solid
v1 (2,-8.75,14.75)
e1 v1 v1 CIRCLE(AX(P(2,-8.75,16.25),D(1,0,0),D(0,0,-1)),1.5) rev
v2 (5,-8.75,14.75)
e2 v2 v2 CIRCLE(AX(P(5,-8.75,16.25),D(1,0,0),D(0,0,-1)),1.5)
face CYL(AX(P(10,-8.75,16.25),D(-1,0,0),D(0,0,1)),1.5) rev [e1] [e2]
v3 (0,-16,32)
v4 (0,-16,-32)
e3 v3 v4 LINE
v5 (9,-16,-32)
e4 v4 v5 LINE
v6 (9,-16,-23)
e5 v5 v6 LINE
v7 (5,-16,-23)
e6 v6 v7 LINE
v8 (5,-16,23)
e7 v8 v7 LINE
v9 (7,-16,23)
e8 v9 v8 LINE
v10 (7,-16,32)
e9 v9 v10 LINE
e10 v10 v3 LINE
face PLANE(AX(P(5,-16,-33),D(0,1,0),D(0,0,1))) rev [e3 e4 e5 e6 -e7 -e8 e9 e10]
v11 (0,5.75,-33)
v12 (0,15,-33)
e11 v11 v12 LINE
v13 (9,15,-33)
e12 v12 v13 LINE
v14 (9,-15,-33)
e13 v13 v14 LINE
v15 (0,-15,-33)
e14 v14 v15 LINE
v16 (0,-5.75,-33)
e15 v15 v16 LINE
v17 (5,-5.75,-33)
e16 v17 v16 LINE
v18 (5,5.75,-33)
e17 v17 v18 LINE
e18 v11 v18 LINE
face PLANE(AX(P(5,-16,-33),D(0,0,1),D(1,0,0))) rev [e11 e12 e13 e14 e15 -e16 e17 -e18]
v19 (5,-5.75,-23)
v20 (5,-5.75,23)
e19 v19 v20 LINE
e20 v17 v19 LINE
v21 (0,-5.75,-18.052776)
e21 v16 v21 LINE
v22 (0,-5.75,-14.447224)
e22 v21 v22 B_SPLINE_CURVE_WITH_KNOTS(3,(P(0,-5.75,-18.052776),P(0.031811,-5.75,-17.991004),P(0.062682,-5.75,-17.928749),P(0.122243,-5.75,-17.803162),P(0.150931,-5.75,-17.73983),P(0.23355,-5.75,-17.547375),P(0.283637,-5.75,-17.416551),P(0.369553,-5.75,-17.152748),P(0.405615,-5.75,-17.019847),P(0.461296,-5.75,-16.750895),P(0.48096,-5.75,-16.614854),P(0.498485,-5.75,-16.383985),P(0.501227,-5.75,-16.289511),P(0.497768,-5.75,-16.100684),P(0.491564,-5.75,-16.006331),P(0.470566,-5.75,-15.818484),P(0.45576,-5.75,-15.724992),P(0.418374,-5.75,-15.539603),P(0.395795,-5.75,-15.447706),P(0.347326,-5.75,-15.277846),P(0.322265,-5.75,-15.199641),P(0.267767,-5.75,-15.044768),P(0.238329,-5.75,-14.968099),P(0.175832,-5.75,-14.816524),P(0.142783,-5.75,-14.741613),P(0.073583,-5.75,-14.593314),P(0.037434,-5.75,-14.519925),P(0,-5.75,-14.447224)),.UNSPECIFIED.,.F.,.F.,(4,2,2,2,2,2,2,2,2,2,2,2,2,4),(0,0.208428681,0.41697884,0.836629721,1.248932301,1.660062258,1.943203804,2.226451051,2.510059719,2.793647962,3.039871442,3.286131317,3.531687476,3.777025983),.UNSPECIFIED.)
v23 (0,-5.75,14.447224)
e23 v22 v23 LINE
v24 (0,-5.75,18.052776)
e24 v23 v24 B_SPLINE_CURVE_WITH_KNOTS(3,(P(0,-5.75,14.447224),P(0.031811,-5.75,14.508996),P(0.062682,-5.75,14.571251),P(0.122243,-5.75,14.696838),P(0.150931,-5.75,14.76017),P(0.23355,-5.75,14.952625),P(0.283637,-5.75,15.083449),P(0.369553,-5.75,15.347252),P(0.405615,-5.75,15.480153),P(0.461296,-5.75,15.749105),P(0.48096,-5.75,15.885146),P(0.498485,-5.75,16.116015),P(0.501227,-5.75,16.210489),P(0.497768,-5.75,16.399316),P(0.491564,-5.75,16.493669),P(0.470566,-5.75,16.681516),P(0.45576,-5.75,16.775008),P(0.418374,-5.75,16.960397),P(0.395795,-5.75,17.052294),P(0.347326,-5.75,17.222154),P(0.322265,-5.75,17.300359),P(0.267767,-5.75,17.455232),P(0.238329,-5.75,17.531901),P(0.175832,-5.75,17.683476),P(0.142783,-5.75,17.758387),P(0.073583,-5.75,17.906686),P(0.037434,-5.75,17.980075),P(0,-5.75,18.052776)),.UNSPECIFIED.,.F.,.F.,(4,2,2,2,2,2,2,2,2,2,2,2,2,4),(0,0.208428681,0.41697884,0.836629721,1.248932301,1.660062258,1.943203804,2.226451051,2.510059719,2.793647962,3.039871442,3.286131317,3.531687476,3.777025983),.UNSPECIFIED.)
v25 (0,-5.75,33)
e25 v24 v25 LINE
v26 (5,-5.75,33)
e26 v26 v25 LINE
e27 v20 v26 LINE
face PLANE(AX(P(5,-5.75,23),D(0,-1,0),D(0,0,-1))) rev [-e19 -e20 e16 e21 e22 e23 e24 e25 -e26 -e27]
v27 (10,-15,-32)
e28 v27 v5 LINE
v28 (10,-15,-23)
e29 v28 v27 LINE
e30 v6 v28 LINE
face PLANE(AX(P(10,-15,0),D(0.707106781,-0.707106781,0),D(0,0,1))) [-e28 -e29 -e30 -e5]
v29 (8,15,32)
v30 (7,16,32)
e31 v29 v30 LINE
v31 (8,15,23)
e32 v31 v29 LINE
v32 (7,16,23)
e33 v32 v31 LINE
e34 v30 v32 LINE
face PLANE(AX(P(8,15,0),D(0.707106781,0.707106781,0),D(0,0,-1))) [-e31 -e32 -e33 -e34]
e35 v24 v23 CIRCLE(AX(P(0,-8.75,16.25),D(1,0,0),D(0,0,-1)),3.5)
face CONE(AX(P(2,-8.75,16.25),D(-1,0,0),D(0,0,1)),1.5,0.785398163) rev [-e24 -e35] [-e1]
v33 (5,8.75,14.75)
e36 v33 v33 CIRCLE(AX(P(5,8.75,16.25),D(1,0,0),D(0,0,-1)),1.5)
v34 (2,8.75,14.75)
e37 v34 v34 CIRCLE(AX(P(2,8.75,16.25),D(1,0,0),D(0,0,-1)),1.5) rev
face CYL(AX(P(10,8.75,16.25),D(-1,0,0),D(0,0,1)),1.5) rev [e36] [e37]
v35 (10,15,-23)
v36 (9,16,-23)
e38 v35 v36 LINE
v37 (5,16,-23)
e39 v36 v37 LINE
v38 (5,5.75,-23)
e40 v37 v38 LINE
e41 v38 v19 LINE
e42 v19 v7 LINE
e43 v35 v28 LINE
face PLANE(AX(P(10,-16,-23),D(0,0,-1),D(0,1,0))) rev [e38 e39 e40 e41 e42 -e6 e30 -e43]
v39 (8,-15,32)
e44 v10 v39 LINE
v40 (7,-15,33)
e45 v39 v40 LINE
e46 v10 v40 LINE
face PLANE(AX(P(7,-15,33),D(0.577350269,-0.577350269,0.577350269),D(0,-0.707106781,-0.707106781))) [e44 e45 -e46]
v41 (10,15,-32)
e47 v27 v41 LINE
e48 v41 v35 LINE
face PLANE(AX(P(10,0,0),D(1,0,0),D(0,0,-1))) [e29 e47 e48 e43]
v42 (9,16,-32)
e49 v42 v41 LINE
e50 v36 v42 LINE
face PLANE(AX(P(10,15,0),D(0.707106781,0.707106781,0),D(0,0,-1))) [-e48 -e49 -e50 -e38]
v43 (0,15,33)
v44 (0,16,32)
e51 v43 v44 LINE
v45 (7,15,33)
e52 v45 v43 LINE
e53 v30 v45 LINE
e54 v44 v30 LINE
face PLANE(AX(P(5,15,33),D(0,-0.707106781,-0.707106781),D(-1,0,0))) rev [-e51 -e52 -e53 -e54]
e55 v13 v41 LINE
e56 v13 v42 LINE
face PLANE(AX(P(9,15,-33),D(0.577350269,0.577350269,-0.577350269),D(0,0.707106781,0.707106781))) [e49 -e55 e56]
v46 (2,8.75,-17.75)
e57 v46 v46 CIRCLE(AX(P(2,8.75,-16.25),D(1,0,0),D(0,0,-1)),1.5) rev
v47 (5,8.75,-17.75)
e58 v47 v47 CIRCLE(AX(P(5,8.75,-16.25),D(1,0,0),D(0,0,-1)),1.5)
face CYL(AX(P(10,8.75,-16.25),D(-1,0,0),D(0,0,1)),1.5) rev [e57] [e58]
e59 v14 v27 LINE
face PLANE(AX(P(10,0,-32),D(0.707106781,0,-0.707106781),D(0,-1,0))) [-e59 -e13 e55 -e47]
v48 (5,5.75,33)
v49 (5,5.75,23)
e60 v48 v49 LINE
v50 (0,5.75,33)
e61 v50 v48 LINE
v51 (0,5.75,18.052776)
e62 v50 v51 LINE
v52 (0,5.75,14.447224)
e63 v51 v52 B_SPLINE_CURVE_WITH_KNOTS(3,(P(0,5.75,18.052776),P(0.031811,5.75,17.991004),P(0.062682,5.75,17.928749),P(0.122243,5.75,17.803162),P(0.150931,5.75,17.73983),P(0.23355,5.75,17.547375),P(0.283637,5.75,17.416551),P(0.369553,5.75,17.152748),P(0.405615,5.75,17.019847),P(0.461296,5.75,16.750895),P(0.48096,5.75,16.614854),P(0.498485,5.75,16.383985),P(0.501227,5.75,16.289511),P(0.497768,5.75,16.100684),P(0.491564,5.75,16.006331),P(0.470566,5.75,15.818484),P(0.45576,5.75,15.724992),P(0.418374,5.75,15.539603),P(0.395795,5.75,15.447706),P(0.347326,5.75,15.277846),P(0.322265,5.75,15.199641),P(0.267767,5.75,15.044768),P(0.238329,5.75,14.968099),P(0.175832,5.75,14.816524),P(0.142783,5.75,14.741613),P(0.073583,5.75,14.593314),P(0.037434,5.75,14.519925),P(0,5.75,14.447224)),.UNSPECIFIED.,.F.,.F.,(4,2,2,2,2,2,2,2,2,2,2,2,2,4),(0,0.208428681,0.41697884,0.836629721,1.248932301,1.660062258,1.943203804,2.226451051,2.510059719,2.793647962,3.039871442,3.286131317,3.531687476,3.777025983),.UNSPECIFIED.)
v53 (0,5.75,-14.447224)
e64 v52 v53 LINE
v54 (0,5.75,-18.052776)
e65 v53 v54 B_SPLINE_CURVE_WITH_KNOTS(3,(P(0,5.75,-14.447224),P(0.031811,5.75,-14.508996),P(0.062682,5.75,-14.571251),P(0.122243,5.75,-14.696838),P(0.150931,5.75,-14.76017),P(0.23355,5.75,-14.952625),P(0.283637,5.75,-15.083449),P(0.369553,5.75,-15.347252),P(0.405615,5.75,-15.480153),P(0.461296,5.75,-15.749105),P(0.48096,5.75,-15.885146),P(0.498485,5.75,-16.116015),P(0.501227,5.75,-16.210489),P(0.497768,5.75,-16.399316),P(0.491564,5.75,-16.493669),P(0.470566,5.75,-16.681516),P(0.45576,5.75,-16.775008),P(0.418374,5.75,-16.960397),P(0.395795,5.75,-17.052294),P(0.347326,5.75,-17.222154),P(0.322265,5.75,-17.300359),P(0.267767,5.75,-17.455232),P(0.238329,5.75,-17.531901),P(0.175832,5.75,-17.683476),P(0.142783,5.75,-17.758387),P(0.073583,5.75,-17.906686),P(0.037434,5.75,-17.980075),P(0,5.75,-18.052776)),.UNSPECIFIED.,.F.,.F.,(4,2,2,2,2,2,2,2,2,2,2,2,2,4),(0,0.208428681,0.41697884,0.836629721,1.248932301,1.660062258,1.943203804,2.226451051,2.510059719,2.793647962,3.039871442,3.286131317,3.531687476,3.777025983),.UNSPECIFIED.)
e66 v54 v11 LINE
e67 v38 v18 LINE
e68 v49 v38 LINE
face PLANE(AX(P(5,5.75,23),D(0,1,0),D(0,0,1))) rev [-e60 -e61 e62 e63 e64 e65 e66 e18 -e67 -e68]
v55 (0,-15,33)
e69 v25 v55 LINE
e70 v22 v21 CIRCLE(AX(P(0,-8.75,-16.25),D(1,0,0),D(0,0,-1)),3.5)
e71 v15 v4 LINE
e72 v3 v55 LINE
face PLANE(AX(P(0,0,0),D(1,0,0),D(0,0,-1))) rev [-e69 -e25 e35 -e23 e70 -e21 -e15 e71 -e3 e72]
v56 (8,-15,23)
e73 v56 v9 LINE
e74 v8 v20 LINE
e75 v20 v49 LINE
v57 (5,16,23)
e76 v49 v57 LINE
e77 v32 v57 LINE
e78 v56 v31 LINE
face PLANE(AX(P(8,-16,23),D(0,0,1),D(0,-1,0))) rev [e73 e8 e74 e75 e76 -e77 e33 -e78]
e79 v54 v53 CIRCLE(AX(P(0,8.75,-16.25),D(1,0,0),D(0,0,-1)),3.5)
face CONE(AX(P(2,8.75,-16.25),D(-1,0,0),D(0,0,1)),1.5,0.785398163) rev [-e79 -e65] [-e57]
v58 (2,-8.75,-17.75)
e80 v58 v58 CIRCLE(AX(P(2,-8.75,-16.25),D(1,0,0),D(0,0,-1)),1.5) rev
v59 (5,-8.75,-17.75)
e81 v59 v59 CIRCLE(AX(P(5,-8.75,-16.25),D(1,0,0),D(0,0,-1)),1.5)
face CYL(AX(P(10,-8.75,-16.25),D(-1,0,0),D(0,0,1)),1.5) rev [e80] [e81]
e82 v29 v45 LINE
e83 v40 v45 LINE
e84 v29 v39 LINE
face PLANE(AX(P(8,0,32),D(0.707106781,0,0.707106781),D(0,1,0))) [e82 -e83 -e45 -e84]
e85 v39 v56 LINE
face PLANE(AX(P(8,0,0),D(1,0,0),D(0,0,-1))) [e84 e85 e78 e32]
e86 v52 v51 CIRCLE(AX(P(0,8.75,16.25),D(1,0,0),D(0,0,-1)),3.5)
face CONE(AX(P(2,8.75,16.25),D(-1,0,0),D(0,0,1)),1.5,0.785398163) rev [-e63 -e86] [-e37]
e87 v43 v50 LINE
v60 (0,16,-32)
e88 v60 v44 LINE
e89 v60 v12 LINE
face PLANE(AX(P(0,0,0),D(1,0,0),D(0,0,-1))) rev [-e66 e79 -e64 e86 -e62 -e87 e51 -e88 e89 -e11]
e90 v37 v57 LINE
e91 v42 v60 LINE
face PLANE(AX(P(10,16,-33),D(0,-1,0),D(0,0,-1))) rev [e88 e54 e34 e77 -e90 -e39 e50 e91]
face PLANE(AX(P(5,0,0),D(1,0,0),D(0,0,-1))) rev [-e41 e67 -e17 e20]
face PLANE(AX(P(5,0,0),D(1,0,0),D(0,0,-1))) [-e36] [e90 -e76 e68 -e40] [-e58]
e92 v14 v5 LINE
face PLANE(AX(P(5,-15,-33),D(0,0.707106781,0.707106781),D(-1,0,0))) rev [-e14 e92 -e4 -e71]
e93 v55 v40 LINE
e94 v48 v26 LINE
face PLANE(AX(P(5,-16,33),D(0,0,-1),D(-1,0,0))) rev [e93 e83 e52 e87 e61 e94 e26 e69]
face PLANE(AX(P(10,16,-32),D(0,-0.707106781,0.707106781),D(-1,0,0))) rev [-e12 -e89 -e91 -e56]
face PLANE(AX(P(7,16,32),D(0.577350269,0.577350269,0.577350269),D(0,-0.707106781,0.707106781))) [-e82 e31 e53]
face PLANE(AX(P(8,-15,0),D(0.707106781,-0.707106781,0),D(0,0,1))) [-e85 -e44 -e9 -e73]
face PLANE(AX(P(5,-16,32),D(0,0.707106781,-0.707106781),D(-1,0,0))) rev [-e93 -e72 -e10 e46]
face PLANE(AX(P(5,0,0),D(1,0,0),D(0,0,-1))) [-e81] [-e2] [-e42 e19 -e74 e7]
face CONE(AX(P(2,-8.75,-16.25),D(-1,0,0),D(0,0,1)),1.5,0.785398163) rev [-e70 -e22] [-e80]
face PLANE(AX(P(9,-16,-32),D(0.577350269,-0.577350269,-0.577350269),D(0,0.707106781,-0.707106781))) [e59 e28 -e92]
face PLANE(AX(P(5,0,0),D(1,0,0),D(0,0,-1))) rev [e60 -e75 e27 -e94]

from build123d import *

# Parameters (mm, degrees)
SKETCH_2_W          = 66
SKETCH_2_H          = 32
EXTRUDE_1_DEPTH     = 5
SKETCH_3_W          = 46
SKETCH_3_H          = 11.5
CUT_EXTRUDE_2_DEPTH = 38.013511047
SKETCH_4_W          = 5
SKETCH_4_H          = 11.5
CUT_EXTRUDE_3_DEPTH = 69.095521145
SKETCH_5_W          = 10
SKETCH_5_H          = 32
EXTRUDE_2_DEPTH     = 5
SKETCH_6_W          = 10
SKETCH_6_H          = 32
EXTRUDE_3_DEPTH     = 3
SKETCH_7_R          = 1.5
CUT_EXTRUDE_4_DEPTH = 39.013155617
CHAMFER_1_SIZE      = 2
CHAMFER_2_SIZE      = 1


with BuildPart() as part:
    # 草图2 → 凸台-拉伸1 (new body)
    with BuildSketch(Plane(origin=(0, 0, 0), x_dir=(0, 0, -1), z_dir=(1, 0, 0))):
        Rectangle(SKETCH_2_W, SKETCH_2_H)
    extrude(amount=EXTRUDE_1_DEPTH)

    # 草图3 → 切除-拉伸2 (cut, through all)
    with BuildSketch(Plane.ZY):
        Rectangle(SKETCH_3_W, SKETCH_3_H)
    extrude(amount=-CUT_EXTRUDE_2_DEPTH, mode=Mode.SUBTRACT)

    # 草图4 → 切除-拉伸3 (cut, through all)
    with BuildSketch(Plane(origin=(0, 0, -33), x_dir=(-1, 0, 0), z_dir=(0, 0, -1))):
        with Locations((-2.5, 0)):
            Rectangle(SKETCH_4_W, SKETCH_4_H)
    extrude(amount=-CUT_EXTRUDE_3_DEPTH, mode=Mode.SUBTRACT)


with BuildPart() as cut_extrude_3_piece_1:
    # of the separate pieces the step leaves, piece 1, a body of its own (cut_extrude_3_pieces)
    add(part.part.solids().sort_by_distance((0, -16, -33))[0])



with BuildPart() as cut_extrude_3_piece_2:
    # of the separate pieces the step leaves, piece 2, a body of its own (cut_extrude_3_pieces)
    add(part.part.solids().sort_by_distance((0, 16, -33))[0])


with BuildPart() as cut_extrude_3_piece_1_1:
    add(cut_extrude_3_piece_1.part)

    add(cut_extrude_3_piece_2.part)  # 凸台-拉伸2 merges 切除-拉伸3 piece 2
    # 草图5 → 凸台-拉伸2 (add)
    with BuildSketch(Plane(origin=(5, 0, 0), x_dir=(0, 0, -1), z_dir=(1, 0, 0))):
        with Locations((28, 0)):
            Rectangle(SKETCH_5_W, SKETCH_5_H)
    extrude(amount=EXTRUDE_2_DEPTH)

    # 草图6 → 凸台-拉伸3 (add)
    with BuildSketch(Plane(origin=(5, 0, 0), x_dir=(0, 0, -1), z_dir=(1, 0, 0))):
        with Locations((-28, 0)):
            Rectangle(SKETCH_6_W, SKETCH_6_H)
    extrude(amount=EXTRUDE_3_DEPTH)

    # 草图7 → 切除-拉伸4 (cut, through all)
    with BuildSketch(Plane.ZY):
        with Locations((-16.25, 8.75)):
            Circle(SKETCH_7_R)
        with Locations((16.25, 8.75)):
            Circle(SKETCH_7_R)
        with Locations((16.25, -8.75)):
            Circle(SKETCH_7_R)
        with Locations((-16.25, -8.75)):
            Circle(SKETCH_7_R)
    extrude(amount=-CUT_EXTRUDE_4_DEPTH, mode=Mode.SUBTRACT)

    # 倒角1
    # the kernel refuses this chamfer: 2 mm, written as the material it takes off along each edge
    with BuildSketch(Plane(origin=(0, -8.75, -16.25), x_dir=(0, 0, 1), z_dir=(0, -1, 0))) as chamfer_1_piece_1:
        Polygon((1.5 + CHAMFER_1_SIZE, 0), (1.5, -CHAMFER_1_SIZE), (1.5, 0), align=None)
    revolve(axis=Axis((0, -8.75, -16.25), (-1, 0, 0)), mode=Mode.SUBTRACT)
    with BuildSketch(Plane(origin=(0, -8.75, 16.25), x_dir=(0, 0, 1), z_dir=(0, -1, 0))) as chamfer_1_piece_2:
        Polygon((1.5 + CHAMFER_1_SIZE, 0), (1.5, -CHAMFER_1_SIZE), (1.5, 0), align=None)
    revolve(axis=Axis((0, -8.75, 16.25), (-1, 0, 0)), mode=Mode.SUBTRACT)
    with BuildSketch(Plane(origin=(0, 8.75, 16.25), x_dir=(0, 0, 1), z_dir=(0, -1, 0))) as chamfer_1_piece_3:
        Polygon((1.5 + CHAMFER_1_SIZE, 0), (1.5, -CHAMFER_1_SIZE), (1.5, 0), align=None)
    revolve(axis=Axis((0, 8.75, 16.25), (-1, 0, 0)), mode=Mode.SUBTRACT)
    with BuildSketch(Plane(origin=(0, 8.75, -16.25), x_dir=(0, 0, 1), z_dir=(0, -1, 0))) as chamfer_1_piece_4:
        Polygon((1.5 + CHAMFER_1_SIZE, 0), (1.5, -CHAMFER_1_SIZE), (1.5, 0), align=None)
    revolve(axis=Axis((0, 8.75, -16.25), (-1, 0, 0)), mode=Mode.SUBTRACT)

    # 倒角2
    chamfer_2_edges = [cut_extrude_3_piece_1_1.edges().sort_by_distance(p)[0] for p in [
        (5, 16, -33),
        (10, -16, -28),
        (10, 0, -33),
        (10, 16, -28),
        (4, 16, 33),
        (5, -16, -33),
        (4, -16, 33),
        (8, 0, 33),
        (8, -16, 28),
        (8, 16, 28),
    ]]
    chamfer(chamfer_2_edges, length=CHAMFER_2_SIZE)


solid = cut_extrude_3_piece_1_1.part
